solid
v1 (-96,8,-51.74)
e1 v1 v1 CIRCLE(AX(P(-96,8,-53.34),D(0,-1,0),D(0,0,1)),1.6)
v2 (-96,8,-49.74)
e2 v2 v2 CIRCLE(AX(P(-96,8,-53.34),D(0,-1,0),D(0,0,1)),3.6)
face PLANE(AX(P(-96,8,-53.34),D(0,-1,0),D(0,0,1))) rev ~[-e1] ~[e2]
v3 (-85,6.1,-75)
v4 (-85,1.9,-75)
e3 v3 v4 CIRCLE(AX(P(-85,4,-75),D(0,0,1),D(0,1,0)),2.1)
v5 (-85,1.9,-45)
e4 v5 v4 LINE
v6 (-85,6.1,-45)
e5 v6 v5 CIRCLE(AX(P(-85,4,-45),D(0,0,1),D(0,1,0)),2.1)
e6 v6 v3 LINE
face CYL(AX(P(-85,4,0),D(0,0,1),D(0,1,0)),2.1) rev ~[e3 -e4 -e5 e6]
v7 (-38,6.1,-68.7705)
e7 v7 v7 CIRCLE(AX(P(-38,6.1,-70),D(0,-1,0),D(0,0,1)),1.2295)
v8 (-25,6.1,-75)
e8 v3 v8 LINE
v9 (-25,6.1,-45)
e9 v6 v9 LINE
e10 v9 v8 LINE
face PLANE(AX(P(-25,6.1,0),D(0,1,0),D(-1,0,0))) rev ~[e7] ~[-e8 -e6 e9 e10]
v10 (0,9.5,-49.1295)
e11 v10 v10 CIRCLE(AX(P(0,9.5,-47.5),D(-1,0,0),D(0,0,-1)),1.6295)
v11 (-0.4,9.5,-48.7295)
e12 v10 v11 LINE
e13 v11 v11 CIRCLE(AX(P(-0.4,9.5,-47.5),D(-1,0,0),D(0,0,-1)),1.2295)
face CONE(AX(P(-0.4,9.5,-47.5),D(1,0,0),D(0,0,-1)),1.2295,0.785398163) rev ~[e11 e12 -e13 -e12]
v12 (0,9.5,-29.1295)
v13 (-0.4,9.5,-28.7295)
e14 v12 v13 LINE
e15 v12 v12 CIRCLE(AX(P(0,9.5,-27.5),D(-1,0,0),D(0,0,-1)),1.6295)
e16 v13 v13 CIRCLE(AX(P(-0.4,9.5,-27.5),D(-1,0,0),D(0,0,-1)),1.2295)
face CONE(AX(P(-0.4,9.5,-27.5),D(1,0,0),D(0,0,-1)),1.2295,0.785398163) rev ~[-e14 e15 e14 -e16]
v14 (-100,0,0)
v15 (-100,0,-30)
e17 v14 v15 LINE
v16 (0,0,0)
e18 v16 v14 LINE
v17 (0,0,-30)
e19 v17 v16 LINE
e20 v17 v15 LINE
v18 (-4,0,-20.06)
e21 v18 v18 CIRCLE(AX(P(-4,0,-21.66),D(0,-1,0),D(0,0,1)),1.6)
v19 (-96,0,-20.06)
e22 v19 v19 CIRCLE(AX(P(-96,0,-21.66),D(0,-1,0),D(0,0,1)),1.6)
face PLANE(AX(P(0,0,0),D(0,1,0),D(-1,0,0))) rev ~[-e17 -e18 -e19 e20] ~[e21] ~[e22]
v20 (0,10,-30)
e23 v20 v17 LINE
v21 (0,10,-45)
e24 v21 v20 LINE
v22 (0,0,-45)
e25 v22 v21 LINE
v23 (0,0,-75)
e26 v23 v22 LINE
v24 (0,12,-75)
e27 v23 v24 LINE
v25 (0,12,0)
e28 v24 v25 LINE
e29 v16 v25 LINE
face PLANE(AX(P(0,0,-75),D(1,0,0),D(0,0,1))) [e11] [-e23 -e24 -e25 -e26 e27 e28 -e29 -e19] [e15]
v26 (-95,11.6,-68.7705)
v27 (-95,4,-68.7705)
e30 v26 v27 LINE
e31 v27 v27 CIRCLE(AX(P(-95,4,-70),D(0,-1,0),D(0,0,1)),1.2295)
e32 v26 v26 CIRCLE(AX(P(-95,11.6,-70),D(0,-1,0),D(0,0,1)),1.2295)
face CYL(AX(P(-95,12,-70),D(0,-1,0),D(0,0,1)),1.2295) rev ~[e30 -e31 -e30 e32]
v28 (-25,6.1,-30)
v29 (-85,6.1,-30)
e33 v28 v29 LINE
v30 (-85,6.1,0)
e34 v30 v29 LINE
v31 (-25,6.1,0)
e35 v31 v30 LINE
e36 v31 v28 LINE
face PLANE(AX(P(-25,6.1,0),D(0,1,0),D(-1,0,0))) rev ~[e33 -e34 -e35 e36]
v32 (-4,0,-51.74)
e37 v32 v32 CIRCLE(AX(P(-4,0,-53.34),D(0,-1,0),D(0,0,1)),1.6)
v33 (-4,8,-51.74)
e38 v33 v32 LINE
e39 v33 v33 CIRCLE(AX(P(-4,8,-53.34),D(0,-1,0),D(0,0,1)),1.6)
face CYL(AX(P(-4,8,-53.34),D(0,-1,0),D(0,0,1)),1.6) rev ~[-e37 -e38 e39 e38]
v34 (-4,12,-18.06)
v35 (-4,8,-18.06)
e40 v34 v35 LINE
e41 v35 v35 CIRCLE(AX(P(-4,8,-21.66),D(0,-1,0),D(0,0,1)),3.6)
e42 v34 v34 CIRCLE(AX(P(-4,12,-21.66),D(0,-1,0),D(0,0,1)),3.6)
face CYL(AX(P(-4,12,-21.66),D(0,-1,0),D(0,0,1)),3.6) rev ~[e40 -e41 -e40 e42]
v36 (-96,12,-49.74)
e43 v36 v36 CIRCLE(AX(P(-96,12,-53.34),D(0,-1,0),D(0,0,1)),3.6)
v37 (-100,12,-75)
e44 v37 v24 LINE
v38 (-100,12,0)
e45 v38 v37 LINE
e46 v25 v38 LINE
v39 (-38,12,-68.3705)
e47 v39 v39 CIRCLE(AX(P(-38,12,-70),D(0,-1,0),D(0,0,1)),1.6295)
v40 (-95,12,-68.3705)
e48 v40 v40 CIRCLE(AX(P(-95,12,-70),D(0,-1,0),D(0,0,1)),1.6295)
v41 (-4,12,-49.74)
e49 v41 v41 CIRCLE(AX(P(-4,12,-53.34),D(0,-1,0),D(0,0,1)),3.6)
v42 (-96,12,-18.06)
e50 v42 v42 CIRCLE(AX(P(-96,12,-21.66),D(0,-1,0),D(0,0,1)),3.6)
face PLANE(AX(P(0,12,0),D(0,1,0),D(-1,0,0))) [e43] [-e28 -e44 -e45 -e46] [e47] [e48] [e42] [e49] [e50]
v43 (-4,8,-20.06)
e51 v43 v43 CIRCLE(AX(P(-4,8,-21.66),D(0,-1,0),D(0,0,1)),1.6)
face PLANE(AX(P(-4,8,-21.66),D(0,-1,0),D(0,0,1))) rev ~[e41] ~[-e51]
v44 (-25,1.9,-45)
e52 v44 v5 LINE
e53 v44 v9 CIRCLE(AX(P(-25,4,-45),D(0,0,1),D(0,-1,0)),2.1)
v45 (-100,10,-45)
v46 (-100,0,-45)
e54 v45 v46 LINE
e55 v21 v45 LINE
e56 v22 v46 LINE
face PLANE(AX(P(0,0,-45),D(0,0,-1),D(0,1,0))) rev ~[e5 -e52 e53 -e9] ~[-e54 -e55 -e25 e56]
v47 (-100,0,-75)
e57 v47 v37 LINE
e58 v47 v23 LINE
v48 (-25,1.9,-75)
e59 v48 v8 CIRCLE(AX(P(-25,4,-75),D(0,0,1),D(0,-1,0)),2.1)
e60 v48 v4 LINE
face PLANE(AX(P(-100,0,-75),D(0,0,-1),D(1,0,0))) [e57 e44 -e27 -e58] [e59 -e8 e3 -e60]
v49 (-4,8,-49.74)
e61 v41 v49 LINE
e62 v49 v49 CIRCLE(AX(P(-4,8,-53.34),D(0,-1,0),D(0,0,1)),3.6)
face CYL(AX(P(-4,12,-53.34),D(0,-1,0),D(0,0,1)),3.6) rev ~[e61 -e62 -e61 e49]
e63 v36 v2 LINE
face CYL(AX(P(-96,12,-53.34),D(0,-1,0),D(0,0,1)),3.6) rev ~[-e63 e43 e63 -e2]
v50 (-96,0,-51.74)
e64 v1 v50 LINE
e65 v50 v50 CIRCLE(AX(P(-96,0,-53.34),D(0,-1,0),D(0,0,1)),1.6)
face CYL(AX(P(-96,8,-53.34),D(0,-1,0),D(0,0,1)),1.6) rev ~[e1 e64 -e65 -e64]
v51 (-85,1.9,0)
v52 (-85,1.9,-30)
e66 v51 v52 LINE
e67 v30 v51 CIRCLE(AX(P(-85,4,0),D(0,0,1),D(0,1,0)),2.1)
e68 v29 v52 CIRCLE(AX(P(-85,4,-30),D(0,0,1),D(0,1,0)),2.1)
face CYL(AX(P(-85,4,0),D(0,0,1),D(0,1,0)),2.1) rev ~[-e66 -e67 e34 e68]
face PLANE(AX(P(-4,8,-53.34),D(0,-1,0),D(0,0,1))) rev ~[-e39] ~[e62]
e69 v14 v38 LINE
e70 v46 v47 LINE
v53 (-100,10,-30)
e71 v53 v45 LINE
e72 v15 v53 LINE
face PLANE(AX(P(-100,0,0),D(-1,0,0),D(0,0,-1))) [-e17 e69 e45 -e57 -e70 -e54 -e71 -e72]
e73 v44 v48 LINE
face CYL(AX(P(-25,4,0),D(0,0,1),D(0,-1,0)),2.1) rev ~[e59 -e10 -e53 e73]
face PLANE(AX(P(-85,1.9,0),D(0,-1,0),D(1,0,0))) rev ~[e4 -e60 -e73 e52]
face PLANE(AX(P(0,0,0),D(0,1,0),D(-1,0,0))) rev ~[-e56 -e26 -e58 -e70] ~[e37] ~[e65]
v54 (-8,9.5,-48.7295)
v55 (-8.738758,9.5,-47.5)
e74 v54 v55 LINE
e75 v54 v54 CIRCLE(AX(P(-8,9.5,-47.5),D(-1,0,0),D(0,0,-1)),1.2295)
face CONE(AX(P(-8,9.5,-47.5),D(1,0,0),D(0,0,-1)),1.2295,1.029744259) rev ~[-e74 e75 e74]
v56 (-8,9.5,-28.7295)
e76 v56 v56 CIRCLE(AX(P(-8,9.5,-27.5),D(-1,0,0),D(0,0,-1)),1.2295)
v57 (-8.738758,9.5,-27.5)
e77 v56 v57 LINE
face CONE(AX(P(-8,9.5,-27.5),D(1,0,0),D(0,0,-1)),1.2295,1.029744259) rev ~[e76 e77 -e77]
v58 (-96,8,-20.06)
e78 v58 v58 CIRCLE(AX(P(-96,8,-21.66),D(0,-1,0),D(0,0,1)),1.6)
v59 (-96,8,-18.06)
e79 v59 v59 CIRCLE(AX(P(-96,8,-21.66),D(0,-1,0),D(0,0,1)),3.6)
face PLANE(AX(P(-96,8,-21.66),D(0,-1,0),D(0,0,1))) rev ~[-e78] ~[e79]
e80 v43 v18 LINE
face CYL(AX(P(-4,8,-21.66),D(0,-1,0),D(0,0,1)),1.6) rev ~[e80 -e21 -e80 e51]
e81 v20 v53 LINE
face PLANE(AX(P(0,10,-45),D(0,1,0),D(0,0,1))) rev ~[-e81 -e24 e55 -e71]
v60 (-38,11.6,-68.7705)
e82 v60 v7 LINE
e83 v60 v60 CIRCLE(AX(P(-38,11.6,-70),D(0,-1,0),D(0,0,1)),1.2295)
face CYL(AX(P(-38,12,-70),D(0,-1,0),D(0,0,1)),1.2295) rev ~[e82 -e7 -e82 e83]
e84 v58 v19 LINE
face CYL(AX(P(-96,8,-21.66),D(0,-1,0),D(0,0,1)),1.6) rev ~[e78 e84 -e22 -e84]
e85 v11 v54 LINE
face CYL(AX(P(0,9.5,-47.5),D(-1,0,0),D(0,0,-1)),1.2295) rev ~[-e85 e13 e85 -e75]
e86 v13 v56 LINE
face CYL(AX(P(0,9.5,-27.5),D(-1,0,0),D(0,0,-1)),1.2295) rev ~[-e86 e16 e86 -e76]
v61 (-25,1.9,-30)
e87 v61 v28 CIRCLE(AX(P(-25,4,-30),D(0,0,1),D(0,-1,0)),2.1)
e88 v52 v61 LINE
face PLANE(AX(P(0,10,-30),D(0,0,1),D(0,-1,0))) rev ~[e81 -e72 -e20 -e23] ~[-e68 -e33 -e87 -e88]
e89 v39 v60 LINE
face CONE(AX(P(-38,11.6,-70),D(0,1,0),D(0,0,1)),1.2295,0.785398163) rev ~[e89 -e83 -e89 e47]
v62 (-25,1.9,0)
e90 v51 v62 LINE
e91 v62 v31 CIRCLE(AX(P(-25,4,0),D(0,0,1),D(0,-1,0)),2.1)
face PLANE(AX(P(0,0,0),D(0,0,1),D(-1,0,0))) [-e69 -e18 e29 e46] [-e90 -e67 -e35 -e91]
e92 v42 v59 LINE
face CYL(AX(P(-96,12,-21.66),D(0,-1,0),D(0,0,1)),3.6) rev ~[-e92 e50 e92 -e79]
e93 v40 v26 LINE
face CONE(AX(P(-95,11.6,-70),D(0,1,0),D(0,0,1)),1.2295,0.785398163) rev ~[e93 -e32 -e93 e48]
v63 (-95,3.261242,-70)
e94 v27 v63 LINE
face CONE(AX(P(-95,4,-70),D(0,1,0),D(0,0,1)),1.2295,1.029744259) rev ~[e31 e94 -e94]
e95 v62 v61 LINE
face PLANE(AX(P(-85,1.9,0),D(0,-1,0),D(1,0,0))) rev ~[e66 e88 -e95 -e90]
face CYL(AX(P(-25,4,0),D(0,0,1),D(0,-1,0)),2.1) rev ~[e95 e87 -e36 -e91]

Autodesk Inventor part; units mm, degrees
ref_plane "YZ Plane" through (0, 0, 0) normal (1, 0, 0) x (0, 1, 0)
ref_plane "XZ Plane" through (0, 0, 0) normal (0, 1, 0) x (-1, 0, 0)
ref_plane "XY Plane" through (0, 0, 0) normal (0, 0, 1) x (1, 0, 0)
sketch "Sketch1" plane through (0, 0, 0) normal (0, 1, 0) x (-1, 0, 0)
  line L0 (0, 0) -> (100, 0)
  line L1 (100, 0) -> (100, -75)
  line L2 (100, -75) -> (0, -75)
  line L3 (0, -75) -> (0, 0)
  line L4 (100, -75) -> (100, 0)
  dimension "d0" = 100
  dimension "d1" = 75
extrude "Extrusion1" add sketch "Sketch1" along normal blind 12
sketch "Sketch2" plane through (0, 0, 0) normal (1, 0, 0) x (0, 0, -1)
  line L0 (0, 0) -> (75, 0) projected
  line L1 (30, 0) -> (45, 0)
  line L2 (45, 0) -> (45, 10)
  line L3 (45, 10) -> (30, 10)
  line L4 (30, 10) -> (30, 0)
  line L5 (75, 0) -> (75, 12) projected
  line L6 (0, 0) -> (0, 12) projected
  point P0 (0, 6)
  point P1 (30, 5)
  point P2 (45, 0)
  dimension "d12" = 15
  dimension "d13" = 75
  dimension "d14" = 30
  dimension "d15" = 10
extrude "Extrusion2" cut sketch "Sketch2" against normal through all
sketch "Sketch3" plane through (-100, 0, 0) normal (0, 0, 1) x (1, 0, 0)
  line L0 (0, 0) -> (0, 12) projected
  line L1 (15, 4) -> (75, 4) construction
  line L2 (15, 1.9) -> (75, 1.9)
  line L3 (75, 6.1) -> (15, 6.1)
  arc A0 (15, 6.1) -> (15, 1.9) centre (15, 4) ccw
  arc A1 (75, 1.9) -> (75, 6.1) centre (75, 4) ccw
  line L4 (0, 0) -> (100, 0) projected
  line L5 (0, 12) -> (100, 12) projected
  point P0 (0, 6)
  point P1 (45, 4)
  point P2 (0, 6)
  dimension "d20" = 4.2
  dimension "d21" = 15
  dimension "d22" = 4
  dimension "d23" = 12
  dimension "d60" = 60
extrude "Extrusion3" cut sketch "Sketch3" against normal through all
sketch "Sketch4" plane through (0, 0, -75) normal (1, 0, 0) x (0, 0, -1)
  circle A0 centre (-27.5, 9.5) radius 1.5
  line L0 (-30, 0) -> (0, 0) projected
  line L1 (-30, 10) -> (-30, 0) projected
  line L2 (-30, 0) -> (-45, 0) construction
  line L3 (-45, 0) -> (-37.5, 0) construction
  line L4 (-37.5, 0) -> (-37.5, -2.8944) construction
  circle A1 centre (-47.5, 9.5) radius 1.5
  line L5 (-75, 12) -> (0, 12) projected
  point P0 (-75, 0)
  dimension "d26" = 3
  dimension "d29" = 2.5
  dimension "d30" = 2.5
hole "Hole1" at (0, 9.5, -27.5) at (0, 9.5, -47.5) direction (-1, 0, 0) diameter 2.459 depth 8 tip angle 118 thread size "M3x0.5" class "6H" standard "ISO Metric profile"
chamfer "Chamfer2" distance 0.4 angle 45 2 edges at (0, 9.5, -46.2705) (0, 9.5, -26.2705)
sketch "Sketch6" plane through (0, 12, 0) normal (0, 1, 0) x (1, 0, 0)
  circle A0 centre (-96, 21.66) radius 1
  line L0 (-100, 0) -> (0, 0) projected
  line L1 (-100, 75) -> (-100, 0) projected
  line L2 (-100, 37.5) -> (-44.6159, 37.5) construction
  line L3 (-50, 0) -> (-50, 87.3463) construction
  circle A1 centre (-4, 21.66) radius 1
  circle A2 centre (-96, 53.34) radius 1
  circle A3 centre (-4, 53.34) radius 1
  point P0 (-96, 21.66)
  point P1 (-4, 21.66)
  point P2 (-4, 21.66)
  point P3 (-96, 53.34)
  point P4 (-4, 53.34)
  point P5 (-4, 53.34)
  dimension "d49" = 2
  dimension "d50" = 21.66
  dimension "d52" = 4
hole "Hole3" at (-96, 12, -21.66) at (-96, 12, -53.34) at (-4, 12, -53.34) at (-4, 12, -21.66) direction (0, -1, 0) diameter 3.2 depth 13 tip angle 118 counterbore diameter 7.2 counterbore depth 4
sketch "Sketch8" plane through (0, 12, 0) normal (0, 1, 0) x (1, 0, 0)
  circle A0 centre (-95, 70) radius 2
  line L0 (0, 0) -> (0, 75) construction
  line L1 (0, 37.5) -> (-49.0535, 37.5) construction
  line L2 (-100, 75) -> (-100, 0) projected
  line L3 (0, 75) -> (-100, 75) projected
  line L4 (-66.5, 46.7026) -> (-66.5, 27.8899) construction
  circle A1 centre (-38, 70) radius 2
  point P0 (-38, 70)
  dimension "d61" = 4
  dimension "d75" = 5
  dimension "d76" = 57
  dimension "d77" = 5
hole "Hole4" at (-95, 12, -70) at (-38, 12, -70) direction (0, -1, 0) diameter 2.459 depth 8 tip angle 118 thread size "M3x0.5" class "6H" standard "ISO Metric profile"
chamfer "Chamfer3" distance 0.4 angle 45 2 edges at (-95, 12, -71.2295) (-38, 12, -71.2295)
equation "\"d22\" = 0.333333 * d23"
equation "\"d29\" = d28"
equation "\"d28\" = 2.5"
properties part number "blat" material "Stainless Steel, Austenitic"
